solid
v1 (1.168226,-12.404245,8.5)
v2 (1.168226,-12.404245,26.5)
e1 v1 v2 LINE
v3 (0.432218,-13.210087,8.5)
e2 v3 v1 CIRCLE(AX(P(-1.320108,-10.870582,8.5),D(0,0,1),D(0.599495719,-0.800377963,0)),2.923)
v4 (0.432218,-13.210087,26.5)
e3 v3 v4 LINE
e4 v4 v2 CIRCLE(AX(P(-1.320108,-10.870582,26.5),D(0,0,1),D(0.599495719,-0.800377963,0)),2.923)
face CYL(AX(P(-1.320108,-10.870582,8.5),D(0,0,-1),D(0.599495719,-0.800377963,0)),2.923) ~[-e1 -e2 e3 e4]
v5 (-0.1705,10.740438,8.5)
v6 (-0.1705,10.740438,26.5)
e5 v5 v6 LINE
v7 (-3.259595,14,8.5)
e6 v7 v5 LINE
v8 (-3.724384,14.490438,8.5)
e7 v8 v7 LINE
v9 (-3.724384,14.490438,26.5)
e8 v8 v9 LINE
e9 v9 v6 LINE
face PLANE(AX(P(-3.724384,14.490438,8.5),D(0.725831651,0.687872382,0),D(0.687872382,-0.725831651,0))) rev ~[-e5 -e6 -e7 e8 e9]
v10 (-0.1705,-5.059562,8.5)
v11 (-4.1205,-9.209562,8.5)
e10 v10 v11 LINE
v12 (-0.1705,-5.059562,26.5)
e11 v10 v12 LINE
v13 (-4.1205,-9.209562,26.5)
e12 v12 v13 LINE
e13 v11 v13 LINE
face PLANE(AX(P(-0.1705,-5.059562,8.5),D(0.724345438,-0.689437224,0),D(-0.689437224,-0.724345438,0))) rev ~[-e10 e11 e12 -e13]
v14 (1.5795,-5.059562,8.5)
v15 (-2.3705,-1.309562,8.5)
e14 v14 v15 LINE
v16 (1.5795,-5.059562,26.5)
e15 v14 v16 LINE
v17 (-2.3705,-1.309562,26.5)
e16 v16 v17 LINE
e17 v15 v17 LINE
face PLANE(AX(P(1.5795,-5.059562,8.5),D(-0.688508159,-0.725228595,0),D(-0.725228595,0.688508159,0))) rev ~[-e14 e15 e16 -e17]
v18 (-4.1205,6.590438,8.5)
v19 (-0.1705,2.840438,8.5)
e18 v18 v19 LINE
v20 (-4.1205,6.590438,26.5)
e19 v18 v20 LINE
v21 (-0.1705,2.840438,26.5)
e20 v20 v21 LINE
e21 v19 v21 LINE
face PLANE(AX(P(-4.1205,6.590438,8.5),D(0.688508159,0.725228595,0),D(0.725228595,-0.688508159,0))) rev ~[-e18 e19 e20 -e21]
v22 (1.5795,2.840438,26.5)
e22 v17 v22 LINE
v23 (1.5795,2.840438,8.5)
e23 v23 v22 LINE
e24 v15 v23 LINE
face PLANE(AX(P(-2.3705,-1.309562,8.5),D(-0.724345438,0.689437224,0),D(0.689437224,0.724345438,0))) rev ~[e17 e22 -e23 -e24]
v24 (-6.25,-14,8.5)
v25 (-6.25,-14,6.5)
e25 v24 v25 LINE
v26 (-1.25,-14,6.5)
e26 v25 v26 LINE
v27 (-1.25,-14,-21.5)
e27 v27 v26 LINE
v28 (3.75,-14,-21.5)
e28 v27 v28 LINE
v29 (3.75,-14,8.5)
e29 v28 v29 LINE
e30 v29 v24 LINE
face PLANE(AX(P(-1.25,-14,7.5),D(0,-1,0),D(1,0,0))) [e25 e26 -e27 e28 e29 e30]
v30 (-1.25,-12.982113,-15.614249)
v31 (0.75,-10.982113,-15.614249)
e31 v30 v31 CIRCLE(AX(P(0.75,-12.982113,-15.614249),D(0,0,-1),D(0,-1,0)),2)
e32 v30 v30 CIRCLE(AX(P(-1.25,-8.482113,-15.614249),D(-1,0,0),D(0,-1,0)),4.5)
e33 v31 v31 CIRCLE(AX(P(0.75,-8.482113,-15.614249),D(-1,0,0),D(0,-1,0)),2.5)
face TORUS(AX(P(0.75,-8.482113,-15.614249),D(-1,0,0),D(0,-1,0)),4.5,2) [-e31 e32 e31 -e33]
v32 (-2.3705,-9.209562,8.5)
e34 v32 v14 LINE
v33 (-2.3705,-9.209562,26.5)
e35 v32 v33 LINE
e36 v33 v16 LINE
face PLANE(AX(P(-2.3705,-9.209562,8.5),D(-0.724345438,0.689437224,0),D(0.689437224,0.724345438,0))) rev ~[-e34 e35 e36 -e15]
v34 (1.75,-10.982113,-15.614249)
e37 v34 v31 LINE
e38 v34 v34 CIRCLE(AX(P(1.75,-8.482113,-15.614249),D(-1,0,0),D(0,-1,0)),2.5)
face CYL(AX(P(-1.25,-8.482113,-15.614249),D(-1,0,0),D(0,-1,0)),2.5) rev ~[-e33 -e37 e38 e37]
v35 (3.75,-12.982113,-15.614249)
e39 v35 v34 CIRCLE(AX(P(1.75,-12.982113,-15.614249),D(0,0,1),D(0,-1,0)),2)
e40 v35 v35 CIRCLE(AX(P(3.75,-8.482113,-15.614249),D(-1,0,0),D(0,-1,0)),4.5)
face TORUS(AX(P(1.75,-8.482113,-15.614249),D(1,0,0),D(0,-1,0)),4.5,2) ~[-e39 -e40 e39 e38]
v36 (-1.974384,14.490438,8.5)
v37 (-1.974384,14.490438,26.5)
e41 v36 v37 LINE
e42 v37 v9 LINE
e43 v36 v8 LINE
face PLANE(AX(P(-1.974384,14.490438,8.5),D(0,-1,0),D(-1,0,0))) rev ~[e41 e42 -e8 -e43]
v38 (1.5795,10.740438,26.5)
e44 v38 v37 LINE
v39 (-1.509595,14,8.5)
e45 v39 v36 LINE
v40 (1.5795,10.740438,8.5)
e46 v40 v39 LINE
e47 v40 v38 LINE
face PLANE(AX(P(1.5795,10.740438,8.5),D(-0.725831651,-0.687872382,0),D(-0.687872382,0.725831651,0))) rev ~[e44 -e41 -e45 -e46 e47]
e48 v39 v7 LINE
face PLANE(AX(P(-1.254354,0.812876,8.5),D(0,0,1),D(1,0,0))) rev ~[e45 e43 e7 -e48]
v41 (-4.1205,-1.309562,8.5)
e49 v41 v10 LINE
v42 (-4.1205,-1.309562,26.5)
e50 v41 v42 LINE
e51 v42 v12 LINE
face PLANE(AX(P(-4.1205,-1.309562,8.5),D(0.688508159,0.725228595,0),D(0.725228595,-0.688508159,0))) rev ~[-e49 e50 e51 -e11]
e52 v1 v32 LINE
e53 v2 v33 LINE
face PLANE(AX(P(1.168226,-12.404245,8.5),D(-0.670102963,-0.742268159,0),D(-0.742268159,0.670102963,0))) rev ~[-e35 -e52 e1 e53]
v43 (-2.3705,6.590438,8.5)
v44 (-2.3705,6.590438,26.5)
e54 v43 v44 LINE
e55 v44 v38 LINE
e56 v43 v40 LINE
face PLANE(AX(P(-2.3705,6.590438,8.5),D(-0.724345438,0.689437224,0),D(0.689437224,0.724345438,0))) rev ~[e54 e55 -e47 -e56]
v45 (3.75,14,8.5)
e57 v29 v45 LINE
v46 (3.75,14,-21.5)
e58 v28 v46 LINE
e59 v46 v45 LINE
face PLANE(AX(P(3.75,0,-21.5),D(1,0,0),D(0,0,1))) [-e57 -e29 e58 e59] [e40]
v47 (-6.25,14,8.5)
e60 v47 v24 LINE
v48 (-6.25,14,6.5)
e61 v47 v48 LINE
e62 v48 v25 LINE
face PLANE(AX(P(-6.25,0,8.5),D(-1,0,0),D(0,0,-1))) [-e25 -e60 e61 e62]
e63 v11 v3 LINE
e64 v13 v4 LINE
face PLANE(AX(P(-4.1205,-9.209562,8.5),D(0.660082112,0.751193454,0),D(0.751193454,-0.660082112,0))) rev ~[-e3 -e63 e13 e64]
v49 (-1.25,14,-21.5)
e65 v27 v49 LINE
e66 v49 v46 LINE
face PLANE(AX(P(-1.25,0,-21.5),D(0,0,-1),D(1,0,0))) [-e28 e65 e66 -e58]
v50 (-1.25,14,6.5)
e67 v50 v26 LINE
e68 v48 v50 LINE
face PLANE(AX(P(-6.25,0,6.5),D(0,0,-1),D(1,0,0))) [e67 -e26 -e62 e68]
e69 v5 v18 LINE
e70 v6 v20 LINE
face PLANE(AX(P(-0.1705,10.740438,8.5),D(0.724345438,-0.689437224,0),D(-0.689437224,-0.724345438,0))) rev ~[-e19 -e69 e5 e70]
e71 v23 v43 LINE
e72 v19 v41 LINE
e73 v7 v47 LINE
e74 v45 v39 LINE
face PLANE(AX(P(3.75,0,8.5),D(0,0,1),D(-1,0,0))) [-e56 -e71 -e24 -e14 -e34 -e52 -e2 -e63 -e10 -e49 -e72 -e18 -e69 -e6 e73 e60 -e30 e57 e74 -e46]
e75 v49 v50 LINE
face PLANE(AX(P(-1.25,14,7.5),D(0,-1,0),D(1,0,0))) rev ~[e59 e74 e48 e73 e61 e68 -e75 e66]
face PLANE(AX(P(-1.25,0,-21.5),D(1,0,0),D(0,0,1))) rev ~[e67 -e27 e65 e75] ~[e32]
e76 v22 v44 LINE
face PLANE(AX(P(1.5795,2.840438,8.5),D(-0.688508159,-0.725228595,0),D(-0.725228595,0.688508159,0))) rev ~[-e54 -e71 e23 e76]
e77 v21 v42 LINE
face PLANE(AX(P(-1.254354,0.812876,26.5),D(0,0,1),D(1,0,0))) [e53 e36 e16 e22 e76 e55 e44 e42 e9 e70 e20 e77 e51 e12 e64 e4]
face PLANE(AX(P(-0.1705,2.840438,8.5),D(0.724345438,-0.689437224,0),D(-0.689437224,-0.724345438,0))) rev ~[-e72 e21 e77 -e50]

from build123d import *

# Parameters (mm, degrees)
F0_W     = 5
F0_H     = 28
F1_DEPTH = 14
F3_DEPTH = 18
F4_R     = 2.5
F5_DEPTH = 5
F6_R     = 2


# Not quite as in the source:
# - a feature names something its author has since deleted; it is built from what else it names


with BuildPart() as f1:
    # F0 (on Front) → F1 (new body, symmetric)
    with BuildSketch(Plane.XZ):
        Polygon((3.75, 8.5), (-6.25, 8.5), (-6.25, 6.5), (-1.25, 6.5), (3.75, 6.5), align=None)
        with Locations((1.25, -7.5)):
            Rectangle(F0_W, F0_H)
    extrude(amount=F1_DEPTH, both=True)

    # F2 (on face) → F3 (join)
    with BuildSketch(Plane.XY.offset(8.5)):
        with BuildLine():
            Line((-1.9743843018, 14.4904378137), (-3.7243843018, 14.4904378137))
            Line((-3.7243843018, 14.4904378137), (-0.1705003797, 10.7404378137))
            Line((-0.1705003797, 10.7404378137), (-4.1205003797, 6.5904378137))
            Line((-4.1205003797, 6.5904378137), (-0.1705003797, 2.8404378137))
            Line((-0.1705003797, 2.8404378137), (-4.1205003797, -1.3095621863))
            Line((-4.1205003797, -1.3095621863), (-0.1705003797, -5.0595621863))
            Line((-0.1705003797, -5.0595621863), (-4.1205003797, -9.2095621863))
            Line((-4.1205003797, -9.2095621863), (0.4322179562, -13.2100868422))
            ThreePointArc((0.4322179562, -13.2100868422), (0.838165637, -12.8418212057), (1.1682262547, -12.4042448269))
            Line((1.1682262547, -12.4042448269), (-2.3705003797, -9.2095621863))
            Line((-2.3705003797, -9.2095621863), (1.5794996203, -5.0595621863))
            Line((1.5794996203, -5.0595621863), (-2.3705003797, -1.3095621863))
            Line((-2.3705003797, -1.3095621863), (1.5794996203, 2.8404378137))
            Line((1.5794996203, 2.8404378137), (-2.3705003797, 6.5904378137))
            Line((-2.3705003797, 6.5904378137), (1.5794996203, 10.7404378137))
            Line((1.5794996203, 10.7404378137), (-1.9743843018, 14.4904378137))
        make_face()
    extrude(amount=F3_DEPTH)

    # F4 (on face) → F5 (cut, symmetric)
    with BuildSketch(Plane(origin=(-1.25, 0, 0), x_dir=(0, -1, 0), z_dir=(-1, 0, 0))):
        with Locations((8.4821127024, -15.6142489255)):
            Circle(F4_R)
    extrude(amount=F5_DEPTH, both=True, mode=Mode.SUBTRACT)

    # F6
    f6_edges = [f1.edges().sort_by_distance(p)[0] for p in [
        (3.75, -5.982113, -15.614249),
        (-1.25, -5.982113, -15.614249),
    ]]
    fillet(f6_edges, radius=F6_R)


solid = f1.part
